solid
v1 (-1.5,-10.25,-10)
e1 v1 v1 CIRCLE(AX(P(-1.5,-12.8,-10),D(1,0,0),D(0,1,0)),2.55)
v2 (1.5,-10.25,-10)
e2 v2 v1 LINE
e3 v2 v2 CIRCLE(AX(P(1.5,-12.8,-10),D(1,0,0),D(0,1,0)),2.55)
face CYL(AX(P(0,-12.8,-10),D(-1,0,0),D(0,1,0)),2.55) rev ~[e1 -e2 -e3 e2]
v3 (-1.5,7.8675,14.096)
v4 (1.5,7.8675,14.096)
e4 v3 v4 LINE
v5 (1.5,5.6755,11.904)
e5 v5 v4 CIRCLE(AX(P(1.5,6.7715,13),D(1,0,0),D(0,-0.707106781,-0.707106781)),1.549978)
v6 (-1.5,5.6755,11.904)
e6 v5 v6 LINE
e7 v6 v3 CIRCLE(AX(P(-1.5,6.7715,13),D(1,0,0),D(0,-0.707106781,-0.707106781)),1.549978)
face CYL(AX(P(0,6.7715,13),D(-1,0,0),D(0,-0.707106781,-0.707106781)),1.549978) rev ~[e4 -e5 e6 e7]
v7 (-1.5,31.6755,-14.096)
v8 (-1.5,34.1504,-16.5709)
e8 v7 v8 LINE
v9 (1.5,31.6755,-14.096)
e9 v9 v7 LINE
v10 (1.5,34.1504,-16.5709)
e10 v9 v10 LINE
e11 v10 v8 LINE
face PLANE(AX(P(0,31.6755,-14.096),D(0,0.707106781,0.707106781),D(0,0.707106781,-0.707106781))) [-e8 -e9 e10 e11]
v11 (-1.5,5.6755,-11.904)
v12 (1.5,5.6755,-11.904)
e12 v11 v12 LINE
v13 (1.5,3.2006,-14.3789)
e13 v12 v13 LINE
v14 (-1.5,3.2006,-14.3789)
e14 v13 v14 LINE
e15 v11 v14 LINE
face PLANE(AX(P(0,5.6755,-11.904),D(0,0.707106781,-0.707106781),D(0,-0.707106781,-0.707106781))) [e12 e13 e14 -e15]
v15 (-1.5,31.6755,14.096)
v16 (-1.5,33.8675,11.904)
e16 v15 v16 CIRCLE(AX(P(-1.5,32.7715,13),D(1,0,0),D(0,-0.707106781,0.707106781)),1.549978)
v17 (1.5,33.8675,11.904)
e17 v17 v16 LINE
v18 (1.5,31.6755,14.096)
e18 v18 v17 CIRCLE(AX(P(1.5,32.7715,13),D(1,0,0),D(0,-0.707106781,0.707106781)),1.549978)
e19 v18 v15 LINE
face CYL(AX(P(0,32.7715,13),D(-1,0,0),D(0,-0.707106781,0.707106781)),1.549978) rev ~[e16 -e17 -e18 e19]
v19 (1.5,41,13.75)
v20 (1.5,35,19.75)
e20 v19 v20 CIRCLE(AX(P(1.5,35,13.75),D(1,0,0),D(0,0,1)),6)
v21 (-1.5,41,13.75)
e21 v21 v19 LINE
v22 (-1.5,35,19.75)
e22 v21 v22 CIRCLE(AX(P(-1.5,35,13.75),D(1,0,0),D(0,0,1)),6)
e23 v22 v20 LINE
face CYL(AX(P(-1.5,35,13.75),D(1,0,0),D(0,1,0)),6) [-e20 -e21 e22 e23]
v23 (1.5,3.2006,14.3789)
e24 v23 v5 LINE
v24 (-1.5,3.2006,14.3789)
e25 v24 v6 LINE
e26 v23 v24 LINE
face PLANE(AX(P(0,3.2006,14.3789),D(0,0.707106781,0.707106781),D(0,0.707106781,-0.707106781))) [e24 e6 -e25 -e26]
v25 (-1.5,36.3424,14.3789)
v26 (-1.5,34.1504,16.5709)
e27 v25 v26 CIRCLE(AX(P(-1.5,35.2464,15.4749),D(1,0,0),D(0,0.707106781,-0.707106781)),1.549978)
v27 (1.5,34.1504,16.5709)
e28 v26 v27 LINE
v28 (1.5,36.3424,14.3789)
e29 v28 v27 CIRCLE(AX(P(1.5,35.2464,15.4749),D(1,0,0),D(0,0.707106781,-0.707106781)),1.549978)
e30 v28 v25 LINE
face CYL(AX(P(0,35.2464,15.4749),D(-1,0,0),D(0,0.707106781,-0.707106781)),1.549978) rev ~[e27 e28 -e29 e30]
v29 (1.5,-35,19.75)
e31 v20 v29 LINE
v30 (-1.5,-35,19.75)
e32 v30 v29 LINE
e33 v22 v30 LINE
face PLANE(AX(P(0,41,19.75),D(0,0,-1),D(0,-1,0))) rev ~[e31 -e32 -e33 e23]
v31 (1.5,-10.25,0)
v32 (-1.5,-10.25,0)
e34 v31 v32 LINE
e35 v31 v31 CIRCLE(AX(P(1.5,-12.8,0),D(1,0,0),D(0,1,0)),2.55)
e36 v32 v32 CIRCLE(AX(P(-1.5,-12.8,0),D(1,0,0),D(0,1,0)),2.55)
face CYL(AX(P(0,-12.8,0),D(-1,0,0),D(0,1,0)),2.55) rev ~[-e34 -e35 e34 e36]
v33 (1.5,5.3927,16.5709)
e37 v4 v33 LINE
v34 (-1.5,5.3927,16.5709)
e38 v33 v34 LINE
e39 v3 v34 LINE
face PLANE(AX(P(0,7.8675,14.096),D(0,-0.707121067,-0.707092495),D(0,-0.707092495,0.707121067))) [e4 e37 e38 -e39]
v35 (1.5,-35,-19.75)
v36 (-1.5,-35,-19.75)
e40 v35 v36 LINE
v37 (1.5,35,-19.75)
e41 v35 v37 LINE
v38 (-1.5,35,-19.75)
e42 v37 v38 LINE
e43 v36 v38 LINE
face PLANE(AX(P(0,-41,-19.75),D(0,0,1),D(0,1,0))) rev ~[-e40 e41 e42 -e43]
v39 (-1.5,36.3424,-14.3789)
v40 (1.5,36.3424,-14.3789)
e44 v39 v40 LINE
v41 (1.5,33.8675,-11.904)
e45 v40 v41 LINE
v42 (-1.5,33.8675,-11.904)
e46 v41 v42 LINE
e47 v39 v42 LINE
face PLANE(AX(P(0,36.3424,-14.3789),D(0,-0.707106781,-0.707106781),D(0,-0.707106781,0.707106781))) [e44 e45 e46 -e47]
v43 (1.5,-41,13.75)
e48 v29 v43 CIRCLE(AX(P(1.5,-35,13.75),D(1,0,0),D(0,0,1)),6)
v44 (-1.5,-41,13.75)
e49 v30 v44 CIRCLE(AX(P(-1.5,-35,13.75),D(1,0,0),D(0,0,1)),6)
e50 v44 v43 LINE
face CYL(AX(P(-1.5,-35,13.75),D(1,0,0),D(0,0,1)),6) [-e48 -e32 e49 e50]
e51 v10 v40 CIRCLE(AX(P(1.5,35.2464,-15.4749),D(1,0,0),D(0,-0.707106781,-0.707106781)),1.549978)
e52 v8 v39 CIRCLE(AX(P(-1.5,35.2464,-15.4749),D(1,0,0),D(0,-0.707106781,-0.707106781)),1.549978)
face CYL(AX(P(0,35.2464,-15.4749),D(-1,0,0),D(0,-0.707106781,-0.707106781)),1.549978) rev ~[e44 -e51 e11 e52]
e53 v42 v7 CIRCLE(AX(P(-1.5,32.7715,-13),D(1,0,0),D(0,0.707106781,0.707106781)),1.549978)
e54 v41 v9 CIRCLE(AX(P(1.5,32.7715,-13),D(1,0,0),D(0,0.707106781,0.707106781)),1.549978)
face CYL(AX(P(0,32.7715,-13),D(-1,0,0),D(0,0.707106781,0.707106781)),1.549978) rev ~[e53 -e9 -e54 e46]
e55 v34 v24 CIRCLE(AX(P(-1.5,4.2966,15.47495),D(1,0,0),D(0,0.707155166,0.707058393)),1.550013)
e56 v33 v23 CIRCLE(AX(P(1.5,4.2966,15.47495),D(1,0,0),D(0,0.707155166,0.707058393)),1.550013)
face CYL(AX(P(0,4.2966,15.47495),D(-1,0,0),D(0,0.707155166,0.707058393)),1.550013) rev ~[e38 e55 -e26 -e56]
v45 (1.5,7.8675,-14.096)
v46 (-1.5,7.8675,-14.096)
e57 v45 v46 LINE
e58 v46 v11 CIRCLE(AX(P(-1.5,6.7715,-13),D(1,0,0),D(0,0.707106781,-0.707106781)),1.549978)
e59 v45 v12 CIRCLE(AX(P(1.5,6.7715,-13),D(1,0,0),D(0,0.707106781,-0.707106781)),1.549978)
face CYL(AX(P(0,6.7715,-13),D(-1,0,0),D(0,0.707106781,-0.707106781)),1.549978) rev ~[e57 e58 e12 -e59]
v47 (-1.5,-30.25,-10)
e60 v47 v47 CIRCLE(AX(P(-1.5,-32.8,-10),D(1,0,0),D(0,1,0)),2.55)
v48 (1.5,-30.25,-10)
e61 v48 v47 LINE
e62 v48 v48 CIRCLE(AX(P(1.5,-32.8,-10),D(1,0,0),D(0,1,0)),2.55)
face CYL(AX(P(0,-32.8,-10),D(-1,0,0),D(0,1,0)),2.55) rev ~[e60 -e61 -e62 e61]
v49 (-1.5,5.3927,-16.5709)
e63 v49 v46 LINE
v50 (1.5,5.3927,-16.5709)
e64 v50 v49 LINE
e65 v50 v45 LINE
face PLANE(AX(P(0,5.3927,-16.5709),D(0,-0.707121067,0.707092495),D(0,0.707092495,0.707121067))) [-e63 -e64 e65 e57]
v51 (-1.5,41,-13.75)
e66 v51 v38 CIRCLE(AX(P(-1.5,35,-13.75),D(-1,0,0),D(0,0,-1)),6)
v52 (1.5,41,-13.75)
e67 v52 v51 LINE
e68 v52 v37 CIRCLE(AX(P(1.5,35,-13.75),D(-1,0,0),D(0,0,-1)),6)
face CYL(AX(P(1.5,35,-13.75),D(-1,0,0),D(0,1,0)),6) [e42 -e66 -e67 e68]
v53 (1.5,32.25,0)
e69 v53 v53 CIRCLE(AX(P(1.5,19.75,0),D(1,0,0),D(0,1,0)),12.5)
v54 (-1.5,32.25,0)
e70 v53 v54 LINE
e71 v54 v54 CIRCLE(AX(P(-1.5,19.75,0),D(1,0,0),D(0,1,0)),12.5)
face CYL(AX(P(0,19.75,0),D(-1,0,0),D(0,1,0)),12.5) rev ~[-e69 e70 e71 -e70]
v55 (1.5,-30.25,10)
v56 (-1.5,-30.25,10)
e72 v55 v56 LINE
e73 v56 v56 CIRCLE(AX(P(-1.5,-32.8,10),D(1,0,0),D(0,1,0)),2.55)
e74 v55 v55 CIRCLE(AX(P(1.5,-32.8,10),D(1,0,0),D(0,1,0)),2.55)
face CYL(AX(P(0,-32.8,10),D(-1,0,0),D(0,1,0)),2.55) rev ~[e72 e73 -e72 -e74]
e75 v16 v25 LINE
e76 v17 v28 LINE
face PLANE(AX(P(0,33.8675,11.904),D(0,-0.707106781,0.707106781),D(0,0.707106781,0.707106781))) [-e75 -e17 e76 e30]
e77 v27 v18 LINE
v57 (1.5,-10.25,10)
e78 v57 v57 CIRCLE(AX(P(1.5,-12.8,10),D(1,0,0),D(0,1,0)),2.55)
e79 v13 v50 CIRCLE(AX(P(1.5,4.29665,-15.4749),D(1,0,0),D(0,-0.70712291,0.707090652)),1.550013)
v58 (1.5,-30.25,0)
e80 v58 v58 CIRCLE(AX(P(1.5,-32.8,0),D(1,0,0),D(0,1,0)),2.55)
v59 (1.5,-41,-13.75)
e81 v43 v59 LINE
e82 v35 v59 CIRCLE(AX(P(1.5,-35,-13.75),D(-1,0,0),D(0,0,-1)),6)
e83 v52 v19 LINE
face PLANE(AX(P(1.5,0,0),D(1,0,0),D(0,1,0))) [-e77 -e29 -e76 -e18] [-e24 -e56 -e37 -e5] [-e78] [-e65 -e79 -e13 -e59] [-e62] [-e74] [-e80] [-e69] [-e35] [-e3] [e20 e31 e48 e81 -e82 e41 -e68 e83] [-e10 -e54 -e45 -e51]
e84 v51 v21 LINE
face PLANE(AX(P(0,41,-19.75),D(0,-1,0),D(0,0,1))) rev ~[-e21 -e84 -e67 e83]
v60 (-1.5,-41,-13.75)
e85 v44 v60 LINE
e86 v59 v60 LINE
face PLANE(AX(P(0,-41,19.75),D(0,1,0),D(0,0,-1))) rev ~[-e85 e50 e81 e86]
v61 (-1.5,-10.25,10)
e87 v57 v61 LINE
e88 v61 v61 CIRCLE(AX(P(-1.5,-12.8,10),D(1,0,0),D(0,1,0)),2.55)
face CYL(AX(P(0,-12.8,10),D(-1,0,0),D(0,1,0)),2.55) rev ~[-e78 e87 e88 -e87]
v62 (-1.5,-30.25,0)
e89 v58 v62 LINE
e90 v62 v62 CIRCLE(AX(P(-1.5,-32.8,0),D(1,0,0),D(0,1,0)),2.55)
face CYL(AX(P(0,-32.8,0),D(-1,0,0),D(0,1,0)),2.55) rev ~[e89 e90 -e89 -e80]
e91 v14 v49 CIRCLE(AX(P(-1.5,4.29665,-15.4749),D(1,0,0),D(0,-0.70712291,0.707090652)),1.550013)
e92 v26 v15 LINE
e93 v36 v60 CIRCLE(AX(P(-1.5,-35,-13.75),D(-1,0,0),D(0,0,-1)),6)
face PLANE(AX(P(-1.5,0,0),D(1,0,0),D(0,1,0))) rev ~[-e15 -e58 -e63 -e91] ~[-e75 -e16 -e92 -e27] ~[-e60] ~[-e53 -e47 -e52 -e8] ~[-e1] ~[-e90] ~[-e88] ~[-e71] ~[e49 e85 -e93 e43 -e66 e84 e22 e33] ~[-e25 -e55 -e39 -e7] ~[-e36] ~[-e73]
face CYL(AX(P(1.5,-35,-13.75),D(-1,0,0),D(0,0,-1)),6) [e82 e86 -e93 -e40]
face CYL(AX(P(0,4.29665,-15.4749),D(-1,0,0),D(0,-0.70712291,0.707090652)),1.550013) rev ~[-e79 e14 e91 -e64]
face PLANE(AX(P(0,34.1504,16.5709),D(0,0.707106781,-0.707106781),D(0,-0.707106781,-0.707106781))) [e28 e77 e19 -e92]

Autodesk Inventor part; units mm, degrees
ref_plane "YZ Plane" through (0, 0, 0) normal (1, 0, 0) x (0, 1, 0)
ref_plane "XZ Plane" through (0, 0, 0) normal (0, 1, 0) x (-1, 0, 0)
ref_plane "XY Plane" through (0, 0, 0) normal (0, 0, 1) x (1, 0, 0)
sketch "Sketch1" plane through (0, 0, 0) normal (1, 0, 0) x (0, 1, 0)
  line L0 (41, 19.75) -> (-41, 19.75)
  line L1 (-41, 19.75) -> (-41, -19.75)
  line L2 (-41, -19.75) -> (41, -19.75)
  line L3 (41, -19.75) -> (41, 19.75)
  line L4 (41, 19.75) -> (-41, -19.75) construction
  line L5 (-41, 19.75) -> (41, -19.75) construction
  circle A0 centre (19.75, 0) radius 12.5
  line L6 (35.2464, 15.4749) -> (32.7715, 13) construction
  line L7 (34.1504, 16.5709) -> (31.6755, 14.096)
  line L8 (33.8675, 11.904) -> (36.3424, 14.3789)
  arc A1 (36.3424, 14.3789) -> (34.1504, 16.5709) centre (35.2464, 15.4749) ccw
  arc A2 (31.6755, 14.096) -> (33.8675, 11.904) centre (32.7715, 13) ccw
  line L9 (35.2464, -15.4749) -> (32.7715, -13) construction
  line L10 (36.3424, -14.3789) -> (33.8675, -11.904)
  line L11 (31.6755, -14.096) -> (34.1504, -16.5709)
  arc A3 (34.1504, -16.5709) -> (36.3424, -14.3789) centre (35.2464, -15.4749) ccw
  arc A4 (33.8675, -11.904) -> (31.6755, -14.096) centre (32.7715, -13) ccw
  line L12 (6.7715, -13) -> (4.2966, -15.4749) construction
  line L13 (5.6755, -11.904) -> (3.2006, -14.3789)
  line L14 (5.3927, -16.5709) -> (7.8675, -14.096)
  arc A5 (7.8675, -14.096) -> (5.6755, -11.904) centre (6.7715, -13) ccw
  arc A6 (3.2006, -14.3789) -> (5.3927, -16.5709) centre (4.2966, -15.4749) ccw
  line L15 (6.7715, 13) -> (4.2966, 15.4749) construction
  line L16 (7.8675, 14.096) -> (5.3927, 16.5709)
  line L17 (3.2006, 14.3789) -> (5.6755, 11.904)
  arc A7 (5.6755, 11.904) -> (7.8675, 14.096) centre (6.7715, 13) ccw
  arc A8 (5.3927, 16.5709) -> (3.2006, 14.3789) centre (4.2966, 15.4749) ccw
  line L18 (-57.4, 0) -> (57.4, 0) construction
  line L19 (0, -27.65) -> (0, 27.65) construction
  circle A9 centre (-32.8, 10) radius 2.55
  circle A10 centre (-32.8, 0) radius 2.55
  circle A11 centre (-32.8, -10) radius 2.55
  circle A12 centre (-12.8, 10) radius 2.55
  circle A13 centre (-12.8, -10) radius 2.55
  circle A14 centre (-12.8, 0) radius 2.55
  point P0 (0, 0)
  point P1 (34.009, 14.2374)
  point P2 (34.009, -14.2374)
  point P3 (5.5341, -14.2374)
  point P4 (5.5341, 14.2374)
  dimension "d0" = 82
  dimension "d1" = 39.5
  dimension "d2" = 25
  dimension "d3" = 21.25
  dimension "d4" = 45
  dimension "d5" = 45
  dimension "d6" = 45
  dimension "d7" = 3.5
  dimension "d8" = 3.5
  dimension "d9" = 3.5
  dimension "d10" = 3.5
  dimension "d11" = 3.1
  dimension "d12" = 3.1
  dimension "d13" = 3.1
  dimension "d14" = 3.1
  dimension "d16" = 18.4
  dimension "d17" = 26
  dimension "d19" = 26
  dimension "d20" = 13
  dimension "d21" = 5.1
  dimension "d22" = 5.1
  dimension "d23" = 5.1
  dimension "d24" = 5.1
  dimension "d25" = 5.1
  dimension "d26" = 5.1
  dimension "d27" = 8.2
  dimension "d28" = 9.75
  dimension "d29" = 9.75
  dimension "d30" = 20
extrude "Plate1" add sketch "Sketch1" along normal mid plane 3
fillet "Corner Round1" radius 6 4 edges at (0, 41, 19.75) (0, 41, -19.75) (0, -41, 19.75) (0, -41, -19.75)
equation "\"d8\" = d7"
equation "\"d22\" = d21"
equation "\"d23\" = d22"
equation "\"d24\" = d23"
equation "\"d25\" = d24"
equation "\"d26\" = d24"
equation "\"d31\" = Thickness"
equation "\"BendRadius\" = Thickness"
equation "\"BendReliefWidth\" = Thickness"
equation "\"BendReliefDepth\" = 0.5 * Thickness"
equation "\"CornerReliefSize\" = 4 * Thickness"
equation "\"MinimumRemnant\" = 2 * Thickness"
equation "\"TransitionRadius\" = BendRadius"
equation "\"JacobiRadiusSize\" = BendRadius"
equation "\"GapSize\" = Thickness"
equation "\"Thickness\" = 3"
properties part number "HCMUTE-CDT23-OP_GA-STEP-42"
